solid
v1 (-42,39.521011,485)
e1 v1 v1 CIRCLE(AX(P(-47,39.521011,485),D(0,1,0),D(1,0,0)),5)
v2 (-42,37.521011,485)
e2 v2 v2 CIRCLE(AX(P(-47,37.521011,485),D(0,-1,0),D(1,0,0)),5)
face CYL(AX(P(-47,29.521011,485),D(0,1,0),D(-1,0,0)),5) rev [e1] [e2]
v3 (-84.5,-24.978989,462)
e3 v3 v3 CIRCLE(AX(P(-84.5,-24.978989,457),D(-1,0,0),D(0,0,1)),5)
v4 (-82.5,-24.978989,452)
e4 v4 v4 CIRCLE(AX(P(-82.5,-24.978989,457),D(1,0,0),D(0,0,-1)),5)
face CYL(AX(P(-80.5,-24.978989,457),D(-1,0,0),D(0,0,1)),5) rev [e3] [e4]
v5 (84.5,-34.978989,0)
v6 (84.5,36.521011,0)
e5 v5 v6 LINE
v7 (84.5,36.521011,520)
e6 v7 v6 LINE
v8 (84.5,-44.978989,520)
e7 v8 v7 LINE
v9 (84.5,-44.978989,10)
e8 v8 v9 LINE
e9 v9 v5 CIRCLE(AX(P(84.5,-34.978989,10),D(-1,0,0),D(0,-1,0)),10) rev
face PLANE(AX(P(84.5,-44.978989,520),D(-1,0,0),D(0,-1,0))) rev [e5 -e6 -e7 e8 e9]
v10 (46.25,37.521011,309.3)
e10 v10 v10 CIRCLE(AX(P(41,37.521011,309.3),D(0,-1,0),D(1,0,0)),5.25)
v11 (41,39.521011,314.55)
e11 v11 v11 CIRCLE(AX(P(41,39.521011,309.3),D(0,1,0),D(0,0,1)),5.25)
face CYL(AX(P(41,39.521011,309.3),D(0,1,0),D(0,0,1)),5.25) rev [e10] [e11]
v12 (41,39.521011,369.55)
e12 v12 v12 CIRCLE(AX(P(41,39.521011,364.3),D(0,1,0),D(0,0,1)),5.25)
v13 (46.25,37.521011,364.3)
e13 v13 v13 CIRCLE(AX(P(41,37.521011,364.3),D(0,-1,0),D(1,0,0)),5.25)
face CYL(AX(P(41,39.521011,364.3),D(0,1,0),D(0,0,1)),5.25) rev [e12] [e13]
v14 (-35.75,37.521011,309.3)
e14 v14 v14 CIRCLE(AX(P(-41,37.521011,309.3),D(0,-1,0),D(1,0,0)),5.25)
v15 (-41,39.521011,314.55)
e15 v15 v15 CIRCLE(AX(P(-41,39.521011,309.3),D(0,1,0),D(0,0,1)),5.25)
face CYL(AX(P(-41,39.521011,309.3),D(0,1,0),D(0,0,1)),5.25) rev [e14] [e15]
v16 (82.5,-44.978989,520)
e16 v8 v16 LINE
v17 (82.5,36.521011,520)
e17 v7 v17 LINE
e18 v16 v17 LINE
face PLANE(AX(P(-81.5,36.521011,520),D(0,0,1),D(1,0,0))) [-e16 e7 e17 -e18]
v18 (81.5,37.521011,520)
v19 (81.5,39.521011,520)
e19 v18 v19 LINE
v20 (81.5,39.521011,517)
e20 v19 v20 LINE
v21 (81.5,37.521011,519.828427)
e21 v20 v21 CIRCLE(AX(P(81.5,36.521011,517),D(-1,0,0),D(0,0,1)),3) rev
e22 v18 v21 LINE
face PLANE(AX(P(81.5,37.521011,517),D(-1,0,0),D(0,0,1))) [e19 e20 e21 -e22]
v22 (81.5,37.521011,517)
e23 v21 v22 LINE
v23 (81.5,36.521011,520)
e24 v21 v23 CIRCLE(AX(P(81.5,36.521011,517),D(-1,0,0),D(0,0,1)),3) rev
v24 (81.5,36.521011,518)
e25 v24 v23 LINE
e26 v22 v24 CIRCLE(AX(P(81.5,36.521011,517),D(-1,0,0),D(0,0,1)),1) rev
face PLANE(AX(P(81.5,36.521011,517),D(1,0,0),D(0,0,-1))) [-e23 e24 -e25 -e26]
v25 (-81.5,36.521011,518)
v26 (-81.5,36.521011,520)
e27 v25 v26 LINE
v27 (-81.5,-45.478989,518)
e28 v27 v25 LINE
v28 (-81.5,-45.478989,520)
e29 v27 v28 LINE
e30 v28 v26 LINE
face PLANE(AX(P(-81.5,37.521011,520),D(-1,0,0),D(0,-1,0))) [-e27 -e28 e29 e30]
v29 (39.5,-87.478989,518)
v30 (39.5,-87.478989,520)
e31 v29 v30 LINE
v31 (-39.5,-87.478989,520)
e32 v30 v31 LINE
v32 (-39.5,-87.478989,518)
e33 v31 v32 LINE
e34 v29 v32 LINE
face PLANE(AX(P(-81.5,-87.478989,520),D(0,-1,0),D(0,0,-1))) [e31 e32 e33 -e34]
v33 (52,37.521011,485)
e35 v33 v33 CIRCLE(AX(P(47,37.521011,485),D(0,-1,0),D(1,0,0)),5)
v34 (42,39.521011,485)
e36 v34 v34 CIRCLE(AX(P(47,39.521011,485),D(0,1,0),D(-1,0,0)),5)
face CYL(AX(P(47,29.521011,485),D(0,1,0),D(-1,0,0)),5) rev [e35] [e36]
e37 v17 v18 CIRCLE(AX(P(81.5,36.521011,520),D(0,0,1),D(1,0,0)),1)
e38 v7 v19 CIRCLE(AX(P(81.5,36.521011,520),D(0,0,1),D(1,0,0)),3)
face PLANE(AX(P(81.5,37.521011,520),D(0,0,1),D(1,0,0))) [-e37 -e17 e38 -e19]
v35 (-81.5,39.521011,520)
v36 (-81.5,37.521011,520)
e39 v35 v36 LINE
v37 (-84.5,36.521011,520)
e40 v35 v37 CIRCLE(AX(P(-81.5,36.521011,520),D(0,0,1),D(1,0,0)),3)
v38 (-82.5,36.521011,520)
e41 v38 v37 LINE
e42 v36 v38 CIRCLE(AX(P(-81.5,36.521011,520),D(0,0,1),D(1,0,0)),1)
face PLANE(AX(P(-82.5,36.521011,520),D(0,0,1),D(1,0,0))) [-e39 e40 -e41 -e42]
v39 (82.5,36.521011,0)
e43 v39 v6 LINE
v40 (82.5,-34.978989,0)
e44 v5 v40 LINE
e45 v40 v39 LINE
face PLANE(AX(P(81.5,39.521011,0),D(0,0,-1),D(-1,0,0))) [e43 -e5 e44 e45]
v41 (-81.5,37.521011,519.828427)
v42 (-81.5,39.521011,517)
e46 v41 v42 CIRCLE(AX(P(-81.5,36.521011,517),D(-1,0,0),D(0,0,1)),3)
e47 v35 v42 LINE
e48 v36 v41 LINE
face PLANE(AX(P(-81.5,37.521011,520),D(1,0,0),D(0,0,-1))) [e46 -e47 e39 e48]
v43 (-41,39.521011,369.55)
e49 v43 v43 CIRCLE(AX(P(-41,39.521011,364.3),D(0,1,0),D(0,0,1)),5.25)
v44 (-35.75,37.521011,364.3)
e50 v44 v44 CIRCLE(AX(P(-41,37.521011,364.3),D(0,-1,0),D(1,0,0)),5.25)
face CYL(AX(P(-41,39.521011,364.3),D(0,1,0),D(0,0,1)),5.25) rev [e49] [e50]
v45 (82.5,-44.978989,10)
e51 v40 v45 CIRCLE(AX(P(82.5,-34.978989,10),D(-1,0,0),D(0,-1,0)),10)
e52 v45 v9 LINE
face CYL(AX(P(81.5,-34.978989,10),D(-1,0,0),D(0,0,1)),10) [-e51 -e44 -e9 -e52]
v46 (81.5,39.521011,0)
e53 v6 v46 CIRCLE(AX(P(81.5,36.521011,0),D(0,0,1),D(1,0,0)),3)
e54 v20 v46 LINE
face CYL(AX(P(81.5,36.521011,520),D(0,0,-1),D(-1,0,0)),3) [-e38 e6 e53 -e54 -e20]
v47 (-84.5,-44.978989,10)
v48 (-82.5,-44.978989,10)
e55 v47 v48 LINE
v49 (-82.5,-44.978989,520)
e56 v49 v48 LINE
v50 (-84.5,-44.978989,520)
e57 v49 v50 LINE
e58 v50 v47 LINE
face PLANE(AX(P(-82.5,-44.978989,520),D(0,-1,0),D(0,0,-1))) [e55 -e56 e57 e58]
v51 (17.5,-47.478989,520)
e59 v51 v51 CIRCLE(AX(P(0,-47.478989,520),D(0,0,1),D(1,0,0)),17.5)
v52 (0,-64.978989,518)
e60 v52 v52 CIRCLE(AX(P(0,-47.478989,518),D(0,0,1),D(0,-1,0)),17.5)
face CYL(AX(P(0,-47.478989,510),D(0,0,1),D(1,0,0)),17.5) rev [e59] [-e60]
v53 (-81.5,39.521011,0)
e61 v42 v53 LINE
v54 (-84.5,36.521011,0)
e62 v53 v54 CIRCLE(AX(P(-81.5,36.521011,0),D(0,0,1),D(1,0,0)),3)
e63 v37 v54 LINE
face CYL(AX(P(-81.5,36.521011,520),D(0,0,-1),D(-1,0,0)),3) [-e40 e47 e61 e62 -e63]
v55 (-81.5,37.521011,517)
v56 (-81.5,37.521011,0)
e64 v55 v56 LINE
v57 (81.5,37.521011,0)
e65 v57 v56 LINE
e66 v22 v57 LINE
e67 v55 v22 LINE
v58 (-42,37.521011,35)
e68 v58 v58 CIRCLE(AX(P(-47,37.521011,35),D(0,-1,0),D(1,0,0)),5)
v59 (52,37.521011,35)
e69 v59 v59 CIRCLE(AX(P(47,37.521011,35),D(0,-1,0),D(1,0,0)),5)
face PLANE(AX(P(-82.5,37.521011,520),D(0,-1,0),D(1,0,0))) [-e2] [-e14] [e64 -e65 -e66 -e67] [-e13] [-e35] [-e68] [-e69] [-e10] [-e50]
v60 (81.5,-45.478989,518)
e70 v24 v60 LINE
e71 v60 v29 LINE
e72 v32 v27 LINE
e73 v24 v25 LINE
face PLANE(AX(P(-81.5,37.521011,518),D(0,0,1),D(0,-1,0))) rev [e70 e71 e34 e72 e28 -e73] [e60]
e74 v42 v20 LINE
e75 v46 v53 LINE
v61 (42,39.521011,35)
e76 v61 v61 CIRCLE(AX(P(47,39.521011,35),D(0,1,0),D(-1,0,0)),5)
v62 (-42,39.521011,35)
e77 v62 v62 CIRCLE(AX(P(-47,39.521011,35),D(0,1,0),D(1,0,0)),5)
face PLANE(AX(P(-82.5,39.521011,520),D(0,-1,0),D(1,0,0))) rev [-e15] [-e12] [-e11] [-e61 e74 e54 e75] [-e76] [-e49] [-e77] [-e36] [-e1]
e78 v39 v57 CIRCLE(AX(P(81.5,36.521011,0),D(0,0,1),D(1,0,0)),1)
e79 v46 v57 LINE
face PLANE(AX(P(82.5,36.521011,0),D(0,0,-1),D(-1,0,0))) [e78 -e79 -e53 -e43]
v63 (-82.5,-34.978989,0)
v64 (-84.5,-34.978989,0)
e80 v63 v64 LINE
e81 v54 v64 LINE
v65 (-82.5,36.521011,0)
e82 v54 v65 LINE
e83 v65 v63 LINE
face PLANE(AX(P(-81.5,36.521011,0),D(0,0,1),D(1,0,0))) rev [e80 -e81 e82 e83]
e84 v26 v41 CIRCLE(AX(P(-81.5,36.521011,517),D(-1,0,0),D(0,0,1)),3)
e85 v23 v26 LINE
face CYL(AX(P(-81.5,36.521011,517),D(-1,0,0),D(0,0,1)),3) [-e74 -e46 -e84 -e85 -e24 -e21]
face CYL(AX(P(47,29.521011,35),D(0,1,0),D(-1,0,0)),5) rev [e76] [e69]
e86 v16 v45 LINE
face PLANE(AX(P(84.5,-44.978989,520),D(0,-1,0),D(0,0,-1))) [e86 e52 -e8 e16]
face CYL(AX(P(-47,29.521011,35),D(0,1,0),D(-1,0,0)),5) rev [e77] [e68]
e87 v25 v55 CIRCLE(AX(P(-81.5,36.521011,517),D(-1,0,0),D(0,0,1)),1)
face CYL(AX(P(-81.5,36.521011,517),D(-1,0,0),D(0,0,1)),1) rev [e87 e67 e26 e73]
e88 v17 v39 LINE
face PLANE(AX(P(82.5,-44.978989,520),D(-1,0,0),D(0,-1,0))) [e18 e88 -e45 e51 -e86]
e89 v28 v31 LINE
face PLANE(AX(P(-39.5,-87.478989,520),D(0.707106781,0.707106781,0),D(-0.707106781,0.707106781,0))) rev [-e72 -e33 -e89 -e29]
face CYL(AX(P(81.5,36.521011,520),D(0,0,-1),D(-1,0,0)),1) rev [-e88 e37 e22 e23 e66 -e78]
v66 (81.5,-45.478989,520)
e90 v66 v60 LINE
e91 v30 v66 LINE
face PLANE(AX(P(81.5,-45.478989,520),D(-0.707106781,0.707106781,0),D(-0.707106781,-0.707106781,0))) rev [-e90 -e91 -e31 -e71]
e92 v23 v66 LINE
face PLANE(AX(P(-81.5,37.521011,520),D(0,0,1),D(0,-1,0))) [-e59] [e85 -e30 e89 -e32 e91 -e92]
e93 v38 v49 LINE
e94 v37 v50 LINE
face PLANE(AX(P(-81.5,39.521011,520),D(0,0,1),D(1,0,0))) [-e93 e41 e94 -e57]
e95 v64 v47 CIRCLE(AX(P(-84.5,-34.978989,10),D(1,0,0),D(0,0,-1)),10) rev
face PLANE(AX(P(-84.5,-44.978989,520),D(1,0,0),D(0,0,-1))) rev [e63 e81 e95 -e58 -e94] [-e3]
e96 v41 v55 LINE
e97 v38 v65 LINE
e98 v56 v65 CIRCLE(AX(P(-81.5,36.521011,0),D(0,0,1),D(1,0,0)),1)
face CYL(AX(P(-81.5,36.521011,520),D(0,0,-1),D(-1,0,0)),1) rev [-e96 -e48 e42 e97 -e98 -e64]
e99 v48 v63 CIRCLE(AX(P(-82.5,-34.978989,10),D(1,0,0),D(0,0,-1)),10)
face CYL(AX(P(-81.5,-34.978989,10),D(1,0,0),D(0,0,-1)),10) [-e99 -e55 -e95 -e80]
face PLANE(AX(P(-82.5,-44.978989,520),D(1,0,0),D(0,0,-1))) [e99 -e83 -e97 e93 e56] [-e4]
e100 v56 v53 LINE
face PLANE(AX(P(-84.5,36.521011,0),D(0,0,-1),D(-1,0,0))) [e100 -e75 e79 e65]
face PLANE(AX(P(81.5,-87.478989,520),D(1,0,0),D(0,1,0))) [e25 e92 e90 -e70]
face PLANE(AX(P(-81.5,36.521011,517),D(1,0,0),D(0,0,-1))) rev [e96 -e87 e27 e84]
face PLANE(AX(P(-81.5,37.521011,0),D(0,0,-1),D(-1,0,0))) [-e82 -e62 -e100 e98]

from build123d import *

# Parameters (mm, degrees)
FLANGE_BASE1_DEPTH                 = 520
ESBO_O6_R                          = 5
CORTE_EXTRUS_O4_DEPTH              = 10
ARESTA_FLANGE1_STRIP_W             = 10
ARESTA_FLANGE1_STRIP_H             = 2
ARESTA_FLANGE1_STRIP_CUT_DEPTH     = 163
ARESTA_FLANGE1_DEPTH               = 163
QUEBRA_CANTO1_START                = 518
QUEBRA_CANTO1_DEPTH                = 2
ESBO_O10_R                         = 17.5
CORTE_EXTRUS_O5_DEPTH              = 10
FILETE1_R                          = 10
ESBO_O11_R                         = 5
CORTE_EXTRUS_O6_DEPTH              = 4
FURO_DE_DI_METRO_10_5_10_5_1_D     = 10.5
FURO_DE_DI_METRO_10_5_10_5_1_DEPTH = 11
FURO_DE_DI_METRO_10_5_10_5_1_TIP   = 3.15451825


# Read off the part's stored shape, not the designer's step: Quebra-Canto1
# Sheet-metal steps are written as plain solids
with BuildPart() as part:
    # Esboço1 → Flange-base1 (new body)
    with BuildSketch(Plane.XY):
        with BuildLine():
            Line((-82.5, -44.978989098), (-82.5, 36.521010902))
            ThreePointArc((-82.5, 36.521010902), (-82.207106781, 37.228117683), (-81.5, 37.521010902))
            Line((-81.5, 37.521010902), (81.5, 37.521010902))
            ThreePointArc((81.5, 37.521010902), (82.207106781, 37.228117683), (82.5, 36.521010902))
            Line((82.5, 36.521010902), (82.5, -44.978989098))
            Line((82.5, -44.978989098), (84.5, -44.978989098))
            Line((84.5, -44.978989098), (84.5, 36.521010902))
            ThreePointArc((84.5, 36.521010902), (83.621320344, 38.642331245), (81.5, 39.521010902))
            Line((81.5, 39.521010902), (-81.5, 39.521010902))
            ThreePointArc((-81.5, 39.521010902), (-83.621320344, 38.642331245), (-84.5, 36.521010902))
            Line((-84.5, 36.521010902), (-84.5, -44.978989098))
            Line((-84.5, -44.978989098), (-82.5, -44.978989098))
        make_face()
    extrude(amount=FLANGE_BASE1_DEPTH)

    # Esboço6 → Corte-extrusão4 (cut)
    with BuildSketch(Plane(origin=(0, 39.521010902, 0), x_dir=(1, 0, 0), z_dir=(0, 1, 0))):
        with Locations(Location((47, -485, 0), (0, 0, 180))):
            Circle(ESBO_O6_R)
        with Locations(Location((47, -35, 0), (0, 0, 180))):
            Circle(ESBO_O6_R)
        with Locations((-47, -485)):
            Circle(ESBO_O6_R)
        with Locations((-47, -35)):
            Circle(ESBO_O6_R)
    extrude(amount=-CORTE_EXTRUS_O4_DEPTH, mode=Mode.SUBTRACT)

    # Aresta-Flange1 strip (across the edge) → Aresta-Flange1 strip cut (cut)
    with BuildSketch(Plane(origin=(81.5, 37.521010902, 520), x_dir=(0, 0, -1), z_dir=(-1, 0, 0))):
        with Locations((-2, -1)):
            Rectangle(ARESTA_FLANGE1_STRIP_W, ARESTA_FLANGE1_STRIP_H)
    extrude(amount=ARESTA_FLANGE1_STRIP_CUT_DEPTH, mode=Mode.SUBTRACT)

    # Aresta-Flange1 section (across the edge) → Aresta-Flange1 (add)
    with BuildSketch(Plane(origin=(81.5, 37.521010902, 520), x_dir=(0, 0, -1), z_dir=(-1, 0, 0))):
        with BuildLine():
            Line((0, 1), (0, 125))
            Line((0, 125), (2, 125))
            Line((2, 125), (2, 1))
            ThreePointArc((2, 1), (2.292893219, 0.292893219), (3, 0))
            Line((3, 0), (3, -2))
            ThreePointArc((3, -2), (0.878679656, -1.121320344), (0, 1))
        make_face()
    extrude(amount=ARESTA_FLANGE1_DEPTH)

    # Quebra-Canto1 outline → Quebra-Canto1 (cut)
    with BuildSketch(Plane.XY.offset(QUEBRA_CANTO1_START)):
        Polygon((81.5, -87.478989098), (81.5, -45.478989098), (39.5, -87.478989098), align=None)
        Polygon((-81.5, -87.478989098), (-39.5, -87.478989098), (-81.5, -45.478989098), align=None)
    extrude(amount=QUEBRA_CANTO1_DEPTH, mode=Mode.SUBTRACT)

    # Esboço10 → Corte-extrusão5 (cut)
    with BuildSketch(Plane.XY.offset(520)):
        with Locations((0, -47.478989098)):
            Circle(ESBO_O10_R)
    extrude(amount=-CORTE_EXTRUS_O5_DEPTH, mode=Mode.SUBTRACT)

    # Filete1
    filete1_edges = [part.edges().sort_by_distance(p)[0] for p in [
        (83.5, -44.978989098, 0),
        (-83.5, -44.978989098, 0),
    ]]
    fillet(filete1_edges, radius=FILETE1_R)

    # Esboço11 → Corte-extrusão6 (cut)
    with BuildSketch(Plane.ZY.offset(84.5)):
        with Locations((457, -24.978989098)):
            Circle(ESBO_O11_R)
    extrude(amount=-CORTE_EXTRUS_O6_DEPTH, mode=Mode.SUBTRACT)

    # Furo de diâmetro Ø10.5 (10.5)1
    with Locations(Plane(origin=(-41, 39.521010902, 364.3), x_dir=(1, 0, 0), z_dir=(0, 1, 0))):
        with Locations((0, 0), (82, 0), (82, 55), (0, 55)):
            Hole(FURO_DE_DI_METRO_10_5_10_5_1_D / 2, depth=FURO_DE_DI_METRO_10_5_10_5_1_DEPTH)
            with Locations((0, 0, -(FURO_DE_DI_METRO_10_5_10_5_1_DEPTH + FURO_DE_DI_METRO_10_5_10_5_1_TIP / 2))):  # 118° drill point
                Cone(0, FURO_DE_DI_METRO_10_5_10_5_1_D / 2, FURO_DE_DI_METRO_10_5_10_5_1_TIP, mode=Mode.SUBTRACT)


solid = part.part
